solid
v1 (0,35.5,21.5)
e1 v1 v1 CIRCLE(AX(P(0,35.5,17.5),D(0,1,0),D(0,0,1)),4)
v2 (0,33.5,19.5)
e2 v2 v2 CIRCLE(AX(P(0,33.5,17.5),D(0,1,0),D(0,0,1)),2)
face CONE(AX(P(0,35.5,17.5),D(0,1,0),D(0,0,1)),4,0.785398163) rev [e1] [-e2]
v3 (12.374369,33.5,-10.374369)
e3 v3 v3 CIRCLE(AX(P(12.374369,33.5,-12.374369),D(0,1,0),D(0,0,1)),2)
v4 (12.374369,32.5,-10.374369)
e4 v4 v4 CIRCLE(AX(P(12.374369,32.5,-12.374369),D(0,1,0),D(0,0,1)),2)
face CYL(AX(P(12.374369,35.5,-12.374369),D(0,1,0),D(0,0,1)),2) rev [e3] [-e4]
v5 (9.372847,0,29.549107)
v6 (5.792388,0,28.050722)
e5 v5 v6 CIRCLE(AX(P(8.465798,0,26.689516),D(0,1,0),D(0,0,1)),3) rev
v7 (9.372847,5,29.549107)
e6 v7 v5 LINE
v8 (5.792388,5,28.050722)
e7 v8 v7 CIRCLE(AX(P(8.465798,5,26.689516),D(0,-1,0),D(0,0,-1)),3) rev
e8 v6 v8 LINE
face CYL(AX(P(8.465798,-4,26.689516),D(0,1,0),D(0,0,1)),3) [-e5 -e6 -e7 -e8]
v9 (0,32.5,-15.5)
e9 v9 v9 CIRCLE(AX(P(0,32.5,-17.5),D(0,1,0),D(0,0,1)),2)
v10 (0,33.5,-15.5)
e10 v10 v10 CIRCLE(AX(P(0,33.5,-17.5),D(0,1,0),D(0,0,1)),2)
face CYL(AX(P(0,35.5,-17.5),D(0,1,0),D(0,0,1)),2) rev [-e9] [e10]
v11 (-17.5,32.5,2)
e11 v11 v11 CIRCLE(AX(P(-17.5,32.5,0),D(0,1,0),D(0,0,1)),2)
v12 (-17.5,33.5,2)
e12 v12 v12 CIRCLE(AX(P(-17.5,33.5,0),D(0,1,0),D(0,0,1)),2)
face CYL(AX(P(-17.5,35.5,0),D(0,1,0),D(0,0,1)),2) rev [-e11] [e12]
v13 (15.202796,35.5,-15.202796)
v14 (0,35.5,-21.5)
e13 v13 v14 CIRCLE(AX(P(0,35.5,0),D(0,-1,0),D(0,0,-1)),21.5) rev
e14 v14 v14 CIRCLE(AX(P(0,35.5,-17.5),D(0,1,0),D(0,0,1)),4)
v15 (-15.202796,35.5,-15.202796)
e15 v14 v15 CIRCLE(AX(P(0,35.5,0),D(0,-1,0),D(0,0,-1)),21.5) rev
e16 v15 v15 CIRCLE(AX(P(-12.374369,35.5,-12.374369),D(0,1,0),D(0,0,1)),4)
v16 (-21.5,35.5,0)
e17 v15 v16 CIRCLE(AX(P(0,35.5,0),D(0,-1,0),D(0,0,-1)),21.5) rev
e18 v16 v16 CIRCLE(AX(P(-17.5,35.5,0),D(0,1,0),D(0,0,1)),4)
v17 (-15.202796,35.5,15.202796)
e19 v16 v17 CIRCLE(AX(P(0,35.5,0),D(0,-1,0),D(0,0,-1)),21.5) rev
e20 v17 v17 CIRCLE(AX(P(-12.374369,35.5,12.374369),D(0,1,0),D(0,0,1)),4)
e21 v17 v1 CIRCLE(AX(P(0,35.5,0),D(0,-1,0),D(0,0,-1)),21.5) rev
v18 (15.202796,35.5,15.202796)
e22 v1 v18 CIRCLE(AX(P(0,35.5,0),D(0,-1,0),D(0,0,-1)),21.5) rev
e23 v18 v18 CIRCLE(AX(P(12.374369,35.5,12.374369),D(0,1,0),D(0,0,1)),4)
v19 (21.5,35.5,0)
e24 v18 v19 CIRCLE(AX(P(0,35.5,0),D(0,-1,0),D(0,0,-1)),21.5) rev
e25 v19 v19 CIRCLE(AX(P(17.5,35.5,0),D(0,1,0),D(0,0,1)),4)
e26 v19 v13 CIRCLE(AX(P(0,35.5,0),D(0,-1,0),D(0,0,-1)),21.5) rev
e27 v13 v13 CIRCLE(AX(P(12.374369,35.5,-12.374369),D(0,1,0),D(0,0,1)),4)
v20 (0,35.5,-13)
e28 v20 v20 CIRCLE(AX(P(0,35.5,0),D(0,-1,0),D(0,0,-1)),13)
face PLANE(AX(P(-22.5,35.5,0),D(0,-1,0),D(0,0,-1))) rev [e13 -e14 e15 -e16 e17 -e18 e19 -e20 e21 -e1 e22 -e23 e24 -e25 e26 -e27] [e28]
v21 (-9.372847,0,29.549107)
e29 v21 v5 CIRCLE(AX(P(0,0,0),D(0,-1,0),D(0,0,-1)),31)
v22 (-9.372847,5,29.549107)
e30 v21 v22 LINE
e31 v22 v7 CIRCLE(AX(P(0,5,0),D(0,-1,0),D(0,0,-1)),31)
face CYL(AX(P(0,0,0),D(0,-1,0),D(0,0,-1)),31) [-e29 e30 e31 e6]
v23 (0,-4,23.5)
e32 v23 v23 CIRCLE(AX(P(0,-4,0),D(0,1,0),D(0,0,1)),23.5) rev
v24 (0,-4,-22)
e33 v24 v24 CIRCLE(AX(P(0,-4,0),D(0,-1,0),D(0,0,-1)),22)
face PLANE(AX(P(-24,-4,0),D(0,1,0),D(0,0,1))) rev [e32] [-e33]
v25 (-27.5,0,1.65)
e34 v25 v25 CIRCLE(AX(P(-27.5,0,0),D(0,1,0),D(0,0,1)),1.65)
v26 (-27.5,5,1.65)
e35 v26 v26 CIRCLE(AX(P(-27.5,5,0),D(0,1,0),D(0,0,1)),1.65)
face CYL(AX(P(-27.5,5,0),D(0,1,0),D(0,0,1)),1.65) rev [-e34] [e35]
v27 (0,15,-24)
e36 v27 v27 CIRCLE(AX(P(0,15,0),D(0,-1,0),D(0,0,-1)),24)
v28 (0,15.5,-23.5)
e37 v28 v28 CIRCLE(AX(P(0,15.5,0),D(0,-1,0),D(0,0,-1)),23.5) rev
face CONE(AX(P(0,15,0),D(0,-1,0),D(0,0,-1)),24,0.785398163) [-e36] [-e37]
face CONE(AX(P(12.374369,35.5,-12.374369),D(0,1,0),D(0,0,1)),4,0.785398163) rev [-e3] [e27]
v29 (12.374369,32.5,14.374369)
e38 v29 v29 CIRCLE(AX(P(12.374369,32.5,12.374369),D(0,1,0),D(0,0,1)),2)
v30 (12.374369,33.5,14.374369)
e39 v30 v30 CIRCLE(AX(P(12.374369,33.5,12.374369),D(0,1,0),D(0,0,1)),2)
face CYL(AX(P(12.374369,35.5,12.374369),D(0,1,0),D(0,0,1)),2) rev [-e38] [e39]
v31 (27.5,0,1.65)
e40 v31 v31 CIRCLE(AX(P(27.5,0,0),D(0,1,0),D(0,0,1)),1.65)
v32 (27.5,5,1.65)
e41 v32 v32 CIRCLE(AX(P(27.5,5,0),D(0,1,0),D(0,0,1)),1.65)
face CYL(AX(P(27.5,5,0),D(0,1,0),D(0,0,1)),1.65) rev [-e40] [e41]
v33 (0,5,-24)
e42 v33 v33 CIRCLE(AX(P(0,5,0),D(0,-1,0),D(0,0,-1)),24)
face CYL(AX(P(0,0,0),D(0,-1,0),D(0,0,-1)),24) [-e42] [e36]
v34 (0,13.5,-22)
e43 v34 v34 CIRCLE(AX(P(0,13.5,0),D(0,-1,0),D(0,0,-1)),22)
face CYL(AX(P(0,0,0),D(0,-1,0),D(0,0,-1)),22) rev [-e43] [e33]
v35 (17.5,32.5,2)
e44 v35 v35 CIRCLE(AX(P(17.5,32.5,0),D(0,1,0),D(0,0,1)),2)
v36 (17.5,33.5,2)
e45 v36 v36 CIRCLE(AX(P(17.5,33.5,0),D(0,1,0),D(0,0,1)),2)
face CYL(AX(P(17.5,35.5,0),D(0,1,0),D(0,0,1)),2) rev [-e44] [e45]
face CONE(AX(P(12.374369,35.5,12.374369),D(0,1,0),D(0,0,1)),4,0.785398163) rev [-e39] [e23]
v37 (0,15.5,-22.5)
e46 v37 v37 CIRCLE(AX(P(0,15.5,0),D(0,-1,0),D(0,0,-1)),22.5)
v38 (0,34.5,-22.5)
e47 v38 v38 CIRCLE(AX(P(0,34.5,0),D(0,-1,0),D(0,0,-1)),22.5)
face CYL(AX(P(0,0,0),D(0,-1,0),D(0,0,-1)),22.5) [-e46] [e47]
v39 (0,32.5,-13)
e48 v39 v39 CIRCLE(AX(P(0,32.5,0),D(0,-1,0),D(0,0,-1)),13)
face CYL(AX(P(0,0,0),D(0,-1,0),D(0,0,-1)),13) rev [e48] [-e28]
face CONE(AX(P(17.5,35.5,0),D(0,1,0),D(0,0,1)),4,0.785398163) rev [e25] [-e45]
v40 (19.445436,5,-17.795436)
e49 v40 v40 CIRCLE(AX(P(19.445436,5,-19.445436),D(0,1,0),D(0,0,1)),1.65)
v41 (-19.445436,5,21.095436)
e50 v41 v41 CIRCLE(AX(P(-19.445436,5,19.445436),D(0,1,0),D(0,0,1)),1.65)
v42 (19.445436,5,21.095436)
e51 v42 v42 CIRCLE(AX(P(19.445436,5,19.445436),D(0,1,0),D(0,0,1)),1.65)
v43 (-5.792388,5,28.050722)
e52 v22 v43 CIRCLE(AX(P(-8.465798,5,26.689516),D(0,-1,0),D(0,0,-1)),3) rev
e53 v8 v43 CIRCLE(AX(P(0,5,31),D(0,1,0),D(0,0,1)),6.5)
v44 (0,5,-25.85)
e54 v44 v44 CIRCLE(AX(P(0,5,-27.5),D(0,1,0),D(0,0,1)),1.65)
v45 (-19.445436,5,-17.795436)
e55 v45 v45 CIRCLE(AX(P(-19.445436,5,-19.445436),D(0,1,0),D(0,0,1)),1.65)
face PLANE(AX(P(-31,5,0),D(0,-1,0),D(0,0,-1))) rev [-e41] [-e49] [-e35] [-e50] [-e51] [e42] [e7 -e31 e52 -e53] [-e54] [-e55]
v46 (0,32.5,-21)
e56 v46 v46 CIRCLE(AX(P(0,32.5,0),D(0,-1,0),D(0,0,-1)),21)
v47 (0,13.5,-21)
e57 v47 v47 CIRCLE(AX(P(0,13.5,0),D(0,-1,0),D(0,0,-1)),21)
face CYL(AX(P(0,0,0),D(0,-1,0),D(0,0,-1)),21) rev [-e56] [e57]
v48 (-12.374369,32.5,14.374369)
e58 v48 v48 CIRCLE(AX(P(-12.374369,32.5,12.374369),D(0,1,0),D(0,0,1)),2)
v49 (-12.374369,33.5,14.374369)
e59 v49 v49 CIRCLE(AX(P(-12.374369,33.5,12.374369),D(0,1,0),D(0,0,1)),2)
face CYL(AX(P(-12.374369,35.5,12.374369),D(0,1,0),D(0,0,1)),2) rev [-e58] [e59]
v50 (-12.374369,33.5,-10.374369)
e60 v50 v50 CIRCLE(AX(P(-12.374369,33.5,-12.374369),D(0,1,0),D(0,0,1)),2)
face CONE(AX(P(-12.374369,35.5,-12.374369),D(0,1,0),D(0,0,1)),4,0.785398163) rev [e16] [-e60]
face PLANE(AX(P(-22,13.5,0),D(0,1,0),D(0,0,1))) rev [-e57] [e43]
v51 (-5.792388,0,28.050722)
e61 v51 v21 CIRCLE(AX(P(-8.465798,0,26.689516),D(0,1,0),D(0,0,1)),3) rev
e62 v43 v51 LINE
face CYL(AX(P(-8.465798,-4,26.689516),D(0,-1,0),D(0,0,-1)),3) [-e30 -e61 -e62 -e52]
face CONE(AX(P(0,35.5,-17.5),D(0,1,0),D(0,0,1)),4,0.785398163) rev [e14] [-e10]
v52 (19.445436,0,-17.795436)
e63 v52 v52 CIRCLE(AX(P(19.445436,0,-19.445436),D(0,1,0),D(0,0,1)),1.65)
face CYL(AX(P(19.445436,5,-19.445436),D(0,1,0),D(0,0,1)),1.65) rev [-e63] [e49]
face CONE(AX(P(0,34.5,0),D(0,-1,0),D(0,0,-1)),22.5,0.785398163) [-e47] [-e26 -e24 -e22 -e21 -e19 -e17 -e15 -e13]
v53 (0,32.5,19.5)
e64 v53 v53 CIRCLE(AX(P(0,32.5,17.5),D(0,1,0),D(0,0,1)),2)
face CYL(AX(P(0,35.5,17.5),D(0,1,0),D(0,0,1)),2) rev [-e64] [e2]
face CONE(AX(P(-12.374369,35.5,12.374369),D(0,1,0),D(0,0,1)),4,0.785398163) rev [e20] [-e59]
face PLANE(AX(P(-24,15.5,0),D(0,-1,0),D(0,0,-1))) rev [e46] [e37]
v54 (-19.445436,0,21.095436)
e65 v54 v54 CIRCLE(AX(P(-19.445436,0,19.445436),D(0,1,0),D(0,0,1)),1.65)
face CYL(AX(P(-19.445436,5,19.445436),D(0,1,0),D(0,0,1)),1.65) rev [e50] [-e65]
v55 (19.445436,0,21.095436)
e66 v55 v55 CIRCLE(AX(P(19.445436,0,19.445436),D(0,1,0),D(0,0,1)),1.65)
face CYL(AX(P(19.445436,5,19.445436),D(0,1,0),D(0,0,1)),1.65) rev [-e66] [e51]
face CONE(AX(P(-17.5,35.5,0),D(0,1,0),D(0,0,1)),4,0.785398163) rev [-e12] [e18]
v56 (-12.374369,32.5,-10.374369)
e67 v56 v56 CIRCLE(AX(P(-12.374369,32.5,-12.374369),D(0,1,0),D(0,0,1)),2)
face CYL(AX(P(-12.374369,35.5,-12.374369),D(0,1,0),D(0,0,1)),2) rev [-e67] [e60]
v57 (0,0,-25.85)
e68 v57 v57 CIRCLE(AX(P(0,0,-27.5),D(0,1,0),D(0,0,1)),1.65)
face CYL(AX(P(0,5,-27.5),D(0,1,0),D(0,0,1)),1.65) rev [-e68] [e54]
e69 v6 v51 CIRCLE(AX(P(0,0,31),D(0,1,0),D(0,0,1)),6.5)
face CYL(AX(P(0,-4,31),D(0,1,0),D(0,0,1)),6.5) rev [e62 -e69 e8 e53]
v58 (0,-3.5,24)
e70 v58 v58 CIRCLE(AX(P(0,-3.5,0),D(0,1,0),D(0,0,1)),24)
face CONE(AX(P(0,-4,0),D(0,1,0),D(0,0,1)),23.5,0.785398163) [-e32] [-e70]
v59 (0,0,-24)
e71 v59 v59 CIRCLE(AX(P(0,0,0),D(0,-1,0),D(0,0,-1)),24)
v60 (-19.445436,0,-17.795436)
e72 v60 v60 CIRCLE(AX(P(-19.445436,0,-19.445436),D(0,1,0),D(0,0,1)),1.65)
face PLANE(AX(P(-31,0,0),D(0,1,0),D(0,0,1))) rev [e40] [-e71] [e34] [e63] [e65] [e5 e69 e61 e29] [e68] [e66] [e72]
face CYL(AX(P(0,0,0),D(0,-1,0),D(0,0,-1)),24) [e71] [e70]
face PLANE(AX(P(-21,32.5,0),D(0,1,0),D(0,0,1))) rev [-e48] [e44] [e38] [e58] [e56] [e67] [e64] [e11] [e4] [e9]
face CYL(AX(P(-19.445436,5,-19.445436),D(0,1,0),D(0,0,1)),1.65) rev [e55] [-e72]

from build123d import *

# Parameters (mm, degrees)
HOLE_WIZARD_M4_1_D        = 3.3
HOLE_WIZARD_1_D           = 4
HOLE_WIZARD_1_CSINK_D     = 8
HOLE_WIZARD_1_CSINK_ANGLE = 90
CHAMFER_1_SIZE            = 0.5
CUT_EXTRUDE_START         = -5
CUT_EXTRUDE_1_OUTLINE_R   = 1.65
CUT_EXTRUDE_1_DEPTH       = 5
FILLET_1_R                = 3


# Read off the part's stored shape, not the designer's step: 切除-拉伸1
with BuildPart() as part:
    # 草图1 → 旋转1 (revolve)
    with BuildSketch(Plane.XY, mode=Mode.PRIVATE) as revolve_1_sk:
        Polygon((-22.5, 35.5), (-13, 35.5), (-13, 32.5), (-21, 32.5), (-21, 13.5), (-22, 13.5), (-22, -4), (-24, -4), (-24, 0), (-31, 0), (-31, 5), (-24, 5), (-24, 15.5), (-22.5, 15.5), align=None)
    revolve(revolve_1_sk.sketch.rotate(Axis((0, 0, 0), (0, 1, 0)), 270), axis=Axis((0, 0, 0), (0, 1, 0)))

    # M4 螺纹孔1 (through all)
    with Locations(Plane(origin=(0, 5, 0), x_dir=(1, 0, 0), z_dir=(0, 1, 0))):
        with Locations((-19.445436483, 19.445436483), (0, 27.5), (19.445436483, 19.445436483), (27.5, 0), (19.445436483, -19.445436483), (0, -27.5), (-19.445436483, -19.445436483), (-27.5, 0)):
            Hole(HOLE_WIZARD_M4_1_D / 2)

    # 孔1 (through all)
    with Locations(Plane(origin=(0, 35.5, 0), x_dir=(1, 0, 0), z_dir=(0, 1, 0))):
        with Locations((0, 17.5), (12.374368671, 12.374368671), (17.5, 0), (12.374368671, -12.374368671), (0, -17.5), (-12.374368671, -12.374368671), (-17.5, 0), (-12.374368671, 12.374368671)):
            CounterSinkHole(HOLE_WIZARD_1_D / 2, HOLE_WIZARD_1_CSINK_D / 2, counter_sink_angle=HOLE_WIZARD_1_CSINK_ANGLE)

    # 倒角1
    chamfer_1_edges = [part.edges().sort_by_distance(p)[0] for p in [
        (0, -4, 24),
        (0, 15.5, 24),
    ]]
    chamfer(chamfer_1_edges, length=CHAMFER_1_SIZE)

    # 切除-拉伸1 outline → 切除-拉伸1 (cut)
    with BuildSketch(Plane(origin=(0, 5, 0), x_dir=(1, 0, 0), z_dir=(0, 1, 0)).offset(CUT_EXTRUDE_START)):
        with BuildLine():
            ThreePointArc((-6.464180048, -30.318548387), (0, -31), (6.464180048, -30.318548387))
            ThreePointArc((6.464180048, -30.318548387), (0, -24.5), (-6.464180048, -30.318548387))
        make_face()
        with Locations((0, -27.5)):
            Circle(CUT_EXTRUDE_1_OUTLINE_R, mode=Mode.SUBTRACT)
    extrude(amount=CUT_EXTRUDE_1_DEPTH, mode=Mode.SUBTRACT)

    # Cut-Extrude 1 2 outline → Cut-Extrude 1 2 (revolve, cut)
    with BuildSketch(Plane.XY):
        Polygon((22.5, 35.5), (21.5, 35.5), (22.5, 34.5), align=None)
    revolve(axis=Axis((0, 0, 0), (0, 1, 0)), mode=Mode.SUBTRACT)

    # 圆角1
    fillet_1_edges = [part.edges().sort_by_distance(p)[0] for p in [
        (-6.464180048, 2.5, 30.318548387),
        (6.464180048, 2.5, 30.318548387),
    ]]
    fillet(fillet_1_edges, radius=FILLET_1_R)


solid = part.part
